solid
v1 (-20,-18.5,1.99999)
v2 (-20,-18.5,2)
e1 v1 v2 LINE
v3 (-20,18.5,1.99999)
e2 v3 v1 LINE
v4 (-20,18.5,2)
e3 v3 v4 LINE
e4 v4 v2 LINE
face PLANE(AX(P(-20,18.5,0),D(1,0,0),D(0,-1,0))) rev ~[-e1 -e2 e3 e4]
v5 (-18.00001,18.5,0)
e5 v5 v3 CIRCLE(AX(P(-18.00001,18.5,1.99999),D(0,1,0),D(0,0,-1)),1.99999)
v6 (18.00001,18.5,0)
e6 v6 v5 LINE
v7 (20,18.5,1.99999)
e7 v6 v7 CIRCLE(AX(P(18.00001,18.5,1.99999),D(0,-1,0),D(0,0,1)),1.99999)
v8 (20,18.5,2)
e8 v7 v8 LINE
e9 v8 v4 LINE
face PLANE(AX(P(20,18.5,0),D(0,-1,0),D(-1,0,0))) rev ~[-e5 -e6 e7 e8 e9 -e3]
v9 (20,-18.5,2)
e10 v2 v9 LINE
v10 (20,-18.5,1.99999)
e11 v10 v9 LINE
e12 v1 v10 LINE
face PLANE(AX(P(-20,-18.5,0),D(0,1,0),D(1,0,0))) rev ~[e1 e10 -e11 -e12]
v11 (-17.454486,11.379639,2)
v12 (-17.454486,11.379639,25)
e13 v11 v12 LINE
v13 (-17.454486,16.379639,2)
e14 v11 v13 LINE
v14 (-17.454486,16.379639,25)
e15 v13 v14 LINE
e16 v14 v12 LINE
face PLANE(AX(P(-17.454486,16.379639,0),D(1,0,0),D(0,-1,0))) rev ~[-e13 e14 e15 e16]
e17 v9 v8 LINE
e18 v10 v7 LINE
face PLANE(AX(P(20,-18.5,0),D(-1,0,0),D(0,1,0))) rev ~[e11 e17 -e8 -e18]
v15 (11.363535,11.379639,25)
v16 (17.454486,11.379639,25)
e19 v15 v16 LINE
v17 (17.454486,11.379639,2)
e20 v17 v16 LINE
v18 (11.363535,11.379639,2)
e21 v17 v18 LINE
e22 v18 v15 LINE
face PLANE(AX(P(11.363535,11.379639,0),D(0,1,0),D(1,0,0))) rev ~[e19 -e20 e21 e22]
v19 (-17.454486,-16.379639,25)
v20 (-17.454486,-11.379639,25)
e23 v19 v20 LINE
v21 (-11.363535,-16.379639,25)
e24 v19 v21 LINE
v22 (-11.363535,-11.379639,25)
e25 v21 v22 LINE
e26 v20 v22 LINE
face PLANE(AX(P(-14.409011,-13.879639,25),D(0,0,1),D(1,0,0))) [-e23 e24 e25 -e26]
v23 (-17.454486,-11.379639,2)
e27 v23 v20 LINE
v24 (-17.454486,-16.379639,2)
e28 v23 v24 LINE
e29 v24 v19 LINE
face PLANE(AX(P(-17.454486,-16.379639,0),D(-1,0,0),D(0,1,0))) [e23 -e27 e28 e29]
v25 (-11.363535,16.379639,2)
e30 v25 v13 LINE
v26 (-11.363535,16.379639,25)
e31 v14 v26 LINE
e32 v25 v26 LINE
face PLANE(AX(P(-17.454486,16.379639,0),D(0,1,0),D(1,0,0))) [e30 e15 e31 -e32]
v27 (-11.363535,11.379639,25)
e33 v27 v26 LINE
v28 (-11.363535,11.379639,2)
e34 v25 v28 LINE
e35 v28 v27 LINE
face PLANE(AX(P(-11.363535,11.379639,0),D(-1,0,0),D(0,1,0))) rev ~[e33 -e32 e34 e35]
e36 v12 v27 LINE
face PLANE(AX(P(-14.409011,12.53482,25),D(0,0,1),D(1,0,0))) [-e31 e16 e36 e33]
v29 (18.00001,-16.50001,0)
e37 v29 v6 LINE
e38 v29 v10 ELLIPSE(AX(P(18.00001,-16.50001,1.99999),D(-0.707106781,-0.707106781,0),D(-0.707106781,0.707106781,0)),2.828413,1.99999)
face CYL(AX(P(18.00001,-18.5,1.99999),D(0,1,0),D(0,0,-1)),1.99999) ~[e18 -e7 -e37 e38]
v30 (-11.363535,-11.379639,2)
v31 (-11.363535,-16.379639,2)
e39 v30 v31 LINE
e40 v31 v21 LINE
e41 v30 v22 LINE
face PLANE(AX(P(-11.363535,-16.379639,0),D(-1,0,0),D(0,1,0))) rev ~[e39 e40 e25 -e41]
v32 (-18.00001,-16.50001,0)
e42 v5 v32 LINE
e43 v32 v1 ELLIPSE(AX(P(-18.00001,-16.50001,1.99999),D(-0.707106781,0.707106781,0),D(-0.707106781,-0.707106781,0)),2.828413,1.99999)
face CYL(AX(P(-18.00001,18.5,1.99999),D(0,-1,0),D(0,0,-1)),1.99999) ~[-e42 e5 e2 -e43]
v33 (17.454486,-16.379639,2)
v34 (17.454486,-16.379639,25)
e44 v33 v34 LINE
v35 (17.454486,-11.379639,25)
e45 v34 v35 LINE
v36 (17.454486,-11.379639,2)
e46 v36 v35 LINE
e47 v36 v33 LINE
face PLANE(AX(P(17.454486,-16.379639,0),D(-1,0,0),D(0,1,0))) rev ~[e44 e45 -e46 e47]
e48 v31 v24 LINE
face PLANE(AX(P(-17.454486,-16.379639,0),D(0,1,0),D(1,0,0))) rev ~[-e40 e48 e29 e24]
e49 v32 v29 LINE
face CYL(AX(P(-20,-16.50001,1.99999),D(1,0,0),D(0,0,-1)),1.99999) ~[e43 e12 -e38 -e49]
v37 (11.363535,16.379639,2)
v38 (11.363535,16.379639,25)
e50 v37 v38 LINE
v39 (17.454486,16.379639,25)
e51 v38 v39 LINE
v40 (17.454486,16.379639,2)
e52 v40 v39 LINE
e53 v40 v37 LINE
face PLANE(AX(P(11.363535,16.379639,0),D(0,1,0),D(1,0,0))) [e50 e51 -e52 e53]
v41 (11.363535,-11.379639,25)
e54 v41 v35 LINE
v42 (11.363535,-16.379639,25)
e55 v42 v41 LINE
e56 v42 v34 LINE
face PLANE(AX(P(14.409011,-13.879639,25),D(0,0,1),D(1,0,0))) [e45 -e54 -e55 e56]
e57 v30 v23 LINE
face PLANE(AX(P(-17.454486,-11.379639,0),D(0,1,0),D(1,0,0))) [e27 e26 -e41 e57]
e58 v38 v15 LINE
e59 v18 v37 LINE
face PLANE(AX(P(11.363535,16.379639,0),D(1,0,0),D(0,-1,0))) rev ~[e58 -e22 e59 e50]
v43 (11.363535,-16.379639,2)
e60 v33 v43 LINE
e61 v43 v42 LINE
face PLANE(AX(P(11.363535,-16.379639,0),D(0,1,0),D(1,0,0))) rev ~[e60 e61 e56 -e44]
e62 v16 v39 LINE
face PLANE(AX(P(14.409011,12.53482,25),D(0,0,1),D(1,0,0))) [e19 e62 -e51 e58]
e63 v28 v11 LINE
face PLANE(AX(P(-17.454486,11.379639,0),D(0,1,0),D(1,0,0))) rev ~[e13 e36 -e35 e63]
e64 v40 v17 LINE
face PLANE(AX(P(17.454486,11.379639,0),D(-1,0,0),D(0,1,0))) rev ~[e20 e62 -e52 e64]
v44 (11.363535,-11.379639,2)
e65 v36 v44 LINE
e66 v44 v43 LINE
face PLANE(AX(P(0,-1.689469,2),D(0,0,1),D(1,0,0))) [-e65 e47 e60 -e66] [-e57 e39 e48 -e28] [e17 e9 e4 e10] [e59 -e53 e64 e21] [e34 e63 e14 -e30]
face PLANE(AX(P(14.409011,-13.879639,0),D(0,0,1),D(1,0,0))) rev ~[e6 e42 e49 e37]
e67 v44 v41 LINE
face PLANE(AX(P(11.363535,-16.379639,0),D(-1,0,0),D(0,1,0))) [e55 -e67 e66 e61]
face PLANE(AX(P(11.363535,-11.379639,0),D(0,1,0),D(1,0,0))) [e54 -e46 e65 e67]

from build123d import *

# Parameters (mm, degrees)
F0_W     = 6.0909511521
F0_H     = 5
F0_H_2   = 2.6896382868
F0_H_3   = 2.3103617132
F1_DEPTH = 2
F2_DEPTH = 25
F4_R     = 1.99999
F5_R     = 6.305532295
F6_DEPTH = 76


# Not quite as in the source:
# - a fillet or chamfer is up to 0.001 mm smaller than in the source, because OpenCascade refuses the exact size
# - an extrude ends at something that could not be found from the text; its depth is read off the source's solid


with BuildPart() as f1:
    # F0 (on Top) → F1 (new body)
    with BuildSketch(Plane.XY):
        Polygon((-17.4544863403, 13.6900003999), (-20, 13.6900003999), (-20, -18.5), (20, -18.5), (20, 13.6900003999), (17.4544863403, 13.6900003999), (17.4544863403, 11.3796386868), (11.3635351881, 11.3796386868), (11.3635351881, 13.6900003999), (-11.3635351881, 13.6900003999), (-11.3635351881, 11.3796386868), (-17.4544863403, 11.3796386868), align=None)
        with Locations((-14.4090107642, -13.8796386868)):
            Rectangle(F0_W, F0_H, mode=Mode.SUBTRACT)
        with Locations((14.4090107642, -13.8796386868)):
            Rectangle(F0_W, F0_H, mode=Mode.SUBTRACT)
        Polygon((20, 18.5), (-20, 18.5), (-20, 13.6900003999), (-17.4544863403, 13.6900003999), (-17.4544863403, 16.3796386868), (-11.3635351881, 16.3796386868), (-11.3635351881, 13.6900003999), (11.3635351881, 13.6900003999), (11.3635351881, 16.3796386868), (17.4544863403, 16.3796386868), (17.4544863403, 13.6900003999), (20, 13.6900003999), align=None)
        with Locations((14.4090107642, -13.8796386868)):
            Rectangle(F0_W, F0_H)
        with Locations((-14.4090107642, -13.8796386868)):
            Rectangle(F0_W, F0_H)
        with Locations((-14.4090107642, 15.0348195434)):
            Rectangle(F0_W, F0_H_2)
        with Locations((14.4090107642, 15.0348195434)):
            Rectangle(F0_W, F0_H_2)
        with Locations((14.4090107642, 12.5348195434)):
            Rectangle(F0_W, F0_H_3)
        with Locations((-14.4090107642, 12.5348195434)):
            Rectangle(F0_W, F0_H_3)
    extrude(amount=F1_DEPTH)

    # F0 (on Top) → F2 (join)
    with BuildSketch(Plane.XY):
        with Locations((14.4090107642, -13.8796386868)):
            Rectangle(F0_W, F0_H)
        with Locations((14.4090107642, 12.5348195434)):
            Rectangle(F0_W, F0_H_3)
        with Locations((14.4090107642, 15.0348195434)):
            Rectangle(F0_W, F0_H_2)
        with Locations((-14.4090107642, 12.5348195434)):
            Rectangle(F0_W, F0_H_3)
        with Locations((-14.4090107642, 15.0348195434)):
            Rectangle(F0_W, F0_H_2)
        with Locations((-14.4090107642, -13.8796386868)):
            Rectangle(F0_W, F0_H)
    extrude(amount=F2_DEPTH)

    # F4 (radius 2 in the source; OpenCascade refuses exactly that, so slightly less here)
    f4_edges = [f1.edges().sort_by_distance(p)[0] for p in [
        (20, 0, 0),
        (-20, 0, 0),
        (0, -18.5, 0),
    ]]
    fillet(f4_edges, radius=F4_R)

    # F5 (on face) → F6 (cut, through all)
    with BuildSketch(Plane(origin=(0, 13.6900003999, 0), x_dir=(-1, 0, 0), z_dir=(0, 1, 0))):
        with Locations((0, -14.4779002294)):
            Circle(F5_R)
    extrude(amount=F6_DEPTH, mode=Mode.SUBTRACT)


solid = f1.part
